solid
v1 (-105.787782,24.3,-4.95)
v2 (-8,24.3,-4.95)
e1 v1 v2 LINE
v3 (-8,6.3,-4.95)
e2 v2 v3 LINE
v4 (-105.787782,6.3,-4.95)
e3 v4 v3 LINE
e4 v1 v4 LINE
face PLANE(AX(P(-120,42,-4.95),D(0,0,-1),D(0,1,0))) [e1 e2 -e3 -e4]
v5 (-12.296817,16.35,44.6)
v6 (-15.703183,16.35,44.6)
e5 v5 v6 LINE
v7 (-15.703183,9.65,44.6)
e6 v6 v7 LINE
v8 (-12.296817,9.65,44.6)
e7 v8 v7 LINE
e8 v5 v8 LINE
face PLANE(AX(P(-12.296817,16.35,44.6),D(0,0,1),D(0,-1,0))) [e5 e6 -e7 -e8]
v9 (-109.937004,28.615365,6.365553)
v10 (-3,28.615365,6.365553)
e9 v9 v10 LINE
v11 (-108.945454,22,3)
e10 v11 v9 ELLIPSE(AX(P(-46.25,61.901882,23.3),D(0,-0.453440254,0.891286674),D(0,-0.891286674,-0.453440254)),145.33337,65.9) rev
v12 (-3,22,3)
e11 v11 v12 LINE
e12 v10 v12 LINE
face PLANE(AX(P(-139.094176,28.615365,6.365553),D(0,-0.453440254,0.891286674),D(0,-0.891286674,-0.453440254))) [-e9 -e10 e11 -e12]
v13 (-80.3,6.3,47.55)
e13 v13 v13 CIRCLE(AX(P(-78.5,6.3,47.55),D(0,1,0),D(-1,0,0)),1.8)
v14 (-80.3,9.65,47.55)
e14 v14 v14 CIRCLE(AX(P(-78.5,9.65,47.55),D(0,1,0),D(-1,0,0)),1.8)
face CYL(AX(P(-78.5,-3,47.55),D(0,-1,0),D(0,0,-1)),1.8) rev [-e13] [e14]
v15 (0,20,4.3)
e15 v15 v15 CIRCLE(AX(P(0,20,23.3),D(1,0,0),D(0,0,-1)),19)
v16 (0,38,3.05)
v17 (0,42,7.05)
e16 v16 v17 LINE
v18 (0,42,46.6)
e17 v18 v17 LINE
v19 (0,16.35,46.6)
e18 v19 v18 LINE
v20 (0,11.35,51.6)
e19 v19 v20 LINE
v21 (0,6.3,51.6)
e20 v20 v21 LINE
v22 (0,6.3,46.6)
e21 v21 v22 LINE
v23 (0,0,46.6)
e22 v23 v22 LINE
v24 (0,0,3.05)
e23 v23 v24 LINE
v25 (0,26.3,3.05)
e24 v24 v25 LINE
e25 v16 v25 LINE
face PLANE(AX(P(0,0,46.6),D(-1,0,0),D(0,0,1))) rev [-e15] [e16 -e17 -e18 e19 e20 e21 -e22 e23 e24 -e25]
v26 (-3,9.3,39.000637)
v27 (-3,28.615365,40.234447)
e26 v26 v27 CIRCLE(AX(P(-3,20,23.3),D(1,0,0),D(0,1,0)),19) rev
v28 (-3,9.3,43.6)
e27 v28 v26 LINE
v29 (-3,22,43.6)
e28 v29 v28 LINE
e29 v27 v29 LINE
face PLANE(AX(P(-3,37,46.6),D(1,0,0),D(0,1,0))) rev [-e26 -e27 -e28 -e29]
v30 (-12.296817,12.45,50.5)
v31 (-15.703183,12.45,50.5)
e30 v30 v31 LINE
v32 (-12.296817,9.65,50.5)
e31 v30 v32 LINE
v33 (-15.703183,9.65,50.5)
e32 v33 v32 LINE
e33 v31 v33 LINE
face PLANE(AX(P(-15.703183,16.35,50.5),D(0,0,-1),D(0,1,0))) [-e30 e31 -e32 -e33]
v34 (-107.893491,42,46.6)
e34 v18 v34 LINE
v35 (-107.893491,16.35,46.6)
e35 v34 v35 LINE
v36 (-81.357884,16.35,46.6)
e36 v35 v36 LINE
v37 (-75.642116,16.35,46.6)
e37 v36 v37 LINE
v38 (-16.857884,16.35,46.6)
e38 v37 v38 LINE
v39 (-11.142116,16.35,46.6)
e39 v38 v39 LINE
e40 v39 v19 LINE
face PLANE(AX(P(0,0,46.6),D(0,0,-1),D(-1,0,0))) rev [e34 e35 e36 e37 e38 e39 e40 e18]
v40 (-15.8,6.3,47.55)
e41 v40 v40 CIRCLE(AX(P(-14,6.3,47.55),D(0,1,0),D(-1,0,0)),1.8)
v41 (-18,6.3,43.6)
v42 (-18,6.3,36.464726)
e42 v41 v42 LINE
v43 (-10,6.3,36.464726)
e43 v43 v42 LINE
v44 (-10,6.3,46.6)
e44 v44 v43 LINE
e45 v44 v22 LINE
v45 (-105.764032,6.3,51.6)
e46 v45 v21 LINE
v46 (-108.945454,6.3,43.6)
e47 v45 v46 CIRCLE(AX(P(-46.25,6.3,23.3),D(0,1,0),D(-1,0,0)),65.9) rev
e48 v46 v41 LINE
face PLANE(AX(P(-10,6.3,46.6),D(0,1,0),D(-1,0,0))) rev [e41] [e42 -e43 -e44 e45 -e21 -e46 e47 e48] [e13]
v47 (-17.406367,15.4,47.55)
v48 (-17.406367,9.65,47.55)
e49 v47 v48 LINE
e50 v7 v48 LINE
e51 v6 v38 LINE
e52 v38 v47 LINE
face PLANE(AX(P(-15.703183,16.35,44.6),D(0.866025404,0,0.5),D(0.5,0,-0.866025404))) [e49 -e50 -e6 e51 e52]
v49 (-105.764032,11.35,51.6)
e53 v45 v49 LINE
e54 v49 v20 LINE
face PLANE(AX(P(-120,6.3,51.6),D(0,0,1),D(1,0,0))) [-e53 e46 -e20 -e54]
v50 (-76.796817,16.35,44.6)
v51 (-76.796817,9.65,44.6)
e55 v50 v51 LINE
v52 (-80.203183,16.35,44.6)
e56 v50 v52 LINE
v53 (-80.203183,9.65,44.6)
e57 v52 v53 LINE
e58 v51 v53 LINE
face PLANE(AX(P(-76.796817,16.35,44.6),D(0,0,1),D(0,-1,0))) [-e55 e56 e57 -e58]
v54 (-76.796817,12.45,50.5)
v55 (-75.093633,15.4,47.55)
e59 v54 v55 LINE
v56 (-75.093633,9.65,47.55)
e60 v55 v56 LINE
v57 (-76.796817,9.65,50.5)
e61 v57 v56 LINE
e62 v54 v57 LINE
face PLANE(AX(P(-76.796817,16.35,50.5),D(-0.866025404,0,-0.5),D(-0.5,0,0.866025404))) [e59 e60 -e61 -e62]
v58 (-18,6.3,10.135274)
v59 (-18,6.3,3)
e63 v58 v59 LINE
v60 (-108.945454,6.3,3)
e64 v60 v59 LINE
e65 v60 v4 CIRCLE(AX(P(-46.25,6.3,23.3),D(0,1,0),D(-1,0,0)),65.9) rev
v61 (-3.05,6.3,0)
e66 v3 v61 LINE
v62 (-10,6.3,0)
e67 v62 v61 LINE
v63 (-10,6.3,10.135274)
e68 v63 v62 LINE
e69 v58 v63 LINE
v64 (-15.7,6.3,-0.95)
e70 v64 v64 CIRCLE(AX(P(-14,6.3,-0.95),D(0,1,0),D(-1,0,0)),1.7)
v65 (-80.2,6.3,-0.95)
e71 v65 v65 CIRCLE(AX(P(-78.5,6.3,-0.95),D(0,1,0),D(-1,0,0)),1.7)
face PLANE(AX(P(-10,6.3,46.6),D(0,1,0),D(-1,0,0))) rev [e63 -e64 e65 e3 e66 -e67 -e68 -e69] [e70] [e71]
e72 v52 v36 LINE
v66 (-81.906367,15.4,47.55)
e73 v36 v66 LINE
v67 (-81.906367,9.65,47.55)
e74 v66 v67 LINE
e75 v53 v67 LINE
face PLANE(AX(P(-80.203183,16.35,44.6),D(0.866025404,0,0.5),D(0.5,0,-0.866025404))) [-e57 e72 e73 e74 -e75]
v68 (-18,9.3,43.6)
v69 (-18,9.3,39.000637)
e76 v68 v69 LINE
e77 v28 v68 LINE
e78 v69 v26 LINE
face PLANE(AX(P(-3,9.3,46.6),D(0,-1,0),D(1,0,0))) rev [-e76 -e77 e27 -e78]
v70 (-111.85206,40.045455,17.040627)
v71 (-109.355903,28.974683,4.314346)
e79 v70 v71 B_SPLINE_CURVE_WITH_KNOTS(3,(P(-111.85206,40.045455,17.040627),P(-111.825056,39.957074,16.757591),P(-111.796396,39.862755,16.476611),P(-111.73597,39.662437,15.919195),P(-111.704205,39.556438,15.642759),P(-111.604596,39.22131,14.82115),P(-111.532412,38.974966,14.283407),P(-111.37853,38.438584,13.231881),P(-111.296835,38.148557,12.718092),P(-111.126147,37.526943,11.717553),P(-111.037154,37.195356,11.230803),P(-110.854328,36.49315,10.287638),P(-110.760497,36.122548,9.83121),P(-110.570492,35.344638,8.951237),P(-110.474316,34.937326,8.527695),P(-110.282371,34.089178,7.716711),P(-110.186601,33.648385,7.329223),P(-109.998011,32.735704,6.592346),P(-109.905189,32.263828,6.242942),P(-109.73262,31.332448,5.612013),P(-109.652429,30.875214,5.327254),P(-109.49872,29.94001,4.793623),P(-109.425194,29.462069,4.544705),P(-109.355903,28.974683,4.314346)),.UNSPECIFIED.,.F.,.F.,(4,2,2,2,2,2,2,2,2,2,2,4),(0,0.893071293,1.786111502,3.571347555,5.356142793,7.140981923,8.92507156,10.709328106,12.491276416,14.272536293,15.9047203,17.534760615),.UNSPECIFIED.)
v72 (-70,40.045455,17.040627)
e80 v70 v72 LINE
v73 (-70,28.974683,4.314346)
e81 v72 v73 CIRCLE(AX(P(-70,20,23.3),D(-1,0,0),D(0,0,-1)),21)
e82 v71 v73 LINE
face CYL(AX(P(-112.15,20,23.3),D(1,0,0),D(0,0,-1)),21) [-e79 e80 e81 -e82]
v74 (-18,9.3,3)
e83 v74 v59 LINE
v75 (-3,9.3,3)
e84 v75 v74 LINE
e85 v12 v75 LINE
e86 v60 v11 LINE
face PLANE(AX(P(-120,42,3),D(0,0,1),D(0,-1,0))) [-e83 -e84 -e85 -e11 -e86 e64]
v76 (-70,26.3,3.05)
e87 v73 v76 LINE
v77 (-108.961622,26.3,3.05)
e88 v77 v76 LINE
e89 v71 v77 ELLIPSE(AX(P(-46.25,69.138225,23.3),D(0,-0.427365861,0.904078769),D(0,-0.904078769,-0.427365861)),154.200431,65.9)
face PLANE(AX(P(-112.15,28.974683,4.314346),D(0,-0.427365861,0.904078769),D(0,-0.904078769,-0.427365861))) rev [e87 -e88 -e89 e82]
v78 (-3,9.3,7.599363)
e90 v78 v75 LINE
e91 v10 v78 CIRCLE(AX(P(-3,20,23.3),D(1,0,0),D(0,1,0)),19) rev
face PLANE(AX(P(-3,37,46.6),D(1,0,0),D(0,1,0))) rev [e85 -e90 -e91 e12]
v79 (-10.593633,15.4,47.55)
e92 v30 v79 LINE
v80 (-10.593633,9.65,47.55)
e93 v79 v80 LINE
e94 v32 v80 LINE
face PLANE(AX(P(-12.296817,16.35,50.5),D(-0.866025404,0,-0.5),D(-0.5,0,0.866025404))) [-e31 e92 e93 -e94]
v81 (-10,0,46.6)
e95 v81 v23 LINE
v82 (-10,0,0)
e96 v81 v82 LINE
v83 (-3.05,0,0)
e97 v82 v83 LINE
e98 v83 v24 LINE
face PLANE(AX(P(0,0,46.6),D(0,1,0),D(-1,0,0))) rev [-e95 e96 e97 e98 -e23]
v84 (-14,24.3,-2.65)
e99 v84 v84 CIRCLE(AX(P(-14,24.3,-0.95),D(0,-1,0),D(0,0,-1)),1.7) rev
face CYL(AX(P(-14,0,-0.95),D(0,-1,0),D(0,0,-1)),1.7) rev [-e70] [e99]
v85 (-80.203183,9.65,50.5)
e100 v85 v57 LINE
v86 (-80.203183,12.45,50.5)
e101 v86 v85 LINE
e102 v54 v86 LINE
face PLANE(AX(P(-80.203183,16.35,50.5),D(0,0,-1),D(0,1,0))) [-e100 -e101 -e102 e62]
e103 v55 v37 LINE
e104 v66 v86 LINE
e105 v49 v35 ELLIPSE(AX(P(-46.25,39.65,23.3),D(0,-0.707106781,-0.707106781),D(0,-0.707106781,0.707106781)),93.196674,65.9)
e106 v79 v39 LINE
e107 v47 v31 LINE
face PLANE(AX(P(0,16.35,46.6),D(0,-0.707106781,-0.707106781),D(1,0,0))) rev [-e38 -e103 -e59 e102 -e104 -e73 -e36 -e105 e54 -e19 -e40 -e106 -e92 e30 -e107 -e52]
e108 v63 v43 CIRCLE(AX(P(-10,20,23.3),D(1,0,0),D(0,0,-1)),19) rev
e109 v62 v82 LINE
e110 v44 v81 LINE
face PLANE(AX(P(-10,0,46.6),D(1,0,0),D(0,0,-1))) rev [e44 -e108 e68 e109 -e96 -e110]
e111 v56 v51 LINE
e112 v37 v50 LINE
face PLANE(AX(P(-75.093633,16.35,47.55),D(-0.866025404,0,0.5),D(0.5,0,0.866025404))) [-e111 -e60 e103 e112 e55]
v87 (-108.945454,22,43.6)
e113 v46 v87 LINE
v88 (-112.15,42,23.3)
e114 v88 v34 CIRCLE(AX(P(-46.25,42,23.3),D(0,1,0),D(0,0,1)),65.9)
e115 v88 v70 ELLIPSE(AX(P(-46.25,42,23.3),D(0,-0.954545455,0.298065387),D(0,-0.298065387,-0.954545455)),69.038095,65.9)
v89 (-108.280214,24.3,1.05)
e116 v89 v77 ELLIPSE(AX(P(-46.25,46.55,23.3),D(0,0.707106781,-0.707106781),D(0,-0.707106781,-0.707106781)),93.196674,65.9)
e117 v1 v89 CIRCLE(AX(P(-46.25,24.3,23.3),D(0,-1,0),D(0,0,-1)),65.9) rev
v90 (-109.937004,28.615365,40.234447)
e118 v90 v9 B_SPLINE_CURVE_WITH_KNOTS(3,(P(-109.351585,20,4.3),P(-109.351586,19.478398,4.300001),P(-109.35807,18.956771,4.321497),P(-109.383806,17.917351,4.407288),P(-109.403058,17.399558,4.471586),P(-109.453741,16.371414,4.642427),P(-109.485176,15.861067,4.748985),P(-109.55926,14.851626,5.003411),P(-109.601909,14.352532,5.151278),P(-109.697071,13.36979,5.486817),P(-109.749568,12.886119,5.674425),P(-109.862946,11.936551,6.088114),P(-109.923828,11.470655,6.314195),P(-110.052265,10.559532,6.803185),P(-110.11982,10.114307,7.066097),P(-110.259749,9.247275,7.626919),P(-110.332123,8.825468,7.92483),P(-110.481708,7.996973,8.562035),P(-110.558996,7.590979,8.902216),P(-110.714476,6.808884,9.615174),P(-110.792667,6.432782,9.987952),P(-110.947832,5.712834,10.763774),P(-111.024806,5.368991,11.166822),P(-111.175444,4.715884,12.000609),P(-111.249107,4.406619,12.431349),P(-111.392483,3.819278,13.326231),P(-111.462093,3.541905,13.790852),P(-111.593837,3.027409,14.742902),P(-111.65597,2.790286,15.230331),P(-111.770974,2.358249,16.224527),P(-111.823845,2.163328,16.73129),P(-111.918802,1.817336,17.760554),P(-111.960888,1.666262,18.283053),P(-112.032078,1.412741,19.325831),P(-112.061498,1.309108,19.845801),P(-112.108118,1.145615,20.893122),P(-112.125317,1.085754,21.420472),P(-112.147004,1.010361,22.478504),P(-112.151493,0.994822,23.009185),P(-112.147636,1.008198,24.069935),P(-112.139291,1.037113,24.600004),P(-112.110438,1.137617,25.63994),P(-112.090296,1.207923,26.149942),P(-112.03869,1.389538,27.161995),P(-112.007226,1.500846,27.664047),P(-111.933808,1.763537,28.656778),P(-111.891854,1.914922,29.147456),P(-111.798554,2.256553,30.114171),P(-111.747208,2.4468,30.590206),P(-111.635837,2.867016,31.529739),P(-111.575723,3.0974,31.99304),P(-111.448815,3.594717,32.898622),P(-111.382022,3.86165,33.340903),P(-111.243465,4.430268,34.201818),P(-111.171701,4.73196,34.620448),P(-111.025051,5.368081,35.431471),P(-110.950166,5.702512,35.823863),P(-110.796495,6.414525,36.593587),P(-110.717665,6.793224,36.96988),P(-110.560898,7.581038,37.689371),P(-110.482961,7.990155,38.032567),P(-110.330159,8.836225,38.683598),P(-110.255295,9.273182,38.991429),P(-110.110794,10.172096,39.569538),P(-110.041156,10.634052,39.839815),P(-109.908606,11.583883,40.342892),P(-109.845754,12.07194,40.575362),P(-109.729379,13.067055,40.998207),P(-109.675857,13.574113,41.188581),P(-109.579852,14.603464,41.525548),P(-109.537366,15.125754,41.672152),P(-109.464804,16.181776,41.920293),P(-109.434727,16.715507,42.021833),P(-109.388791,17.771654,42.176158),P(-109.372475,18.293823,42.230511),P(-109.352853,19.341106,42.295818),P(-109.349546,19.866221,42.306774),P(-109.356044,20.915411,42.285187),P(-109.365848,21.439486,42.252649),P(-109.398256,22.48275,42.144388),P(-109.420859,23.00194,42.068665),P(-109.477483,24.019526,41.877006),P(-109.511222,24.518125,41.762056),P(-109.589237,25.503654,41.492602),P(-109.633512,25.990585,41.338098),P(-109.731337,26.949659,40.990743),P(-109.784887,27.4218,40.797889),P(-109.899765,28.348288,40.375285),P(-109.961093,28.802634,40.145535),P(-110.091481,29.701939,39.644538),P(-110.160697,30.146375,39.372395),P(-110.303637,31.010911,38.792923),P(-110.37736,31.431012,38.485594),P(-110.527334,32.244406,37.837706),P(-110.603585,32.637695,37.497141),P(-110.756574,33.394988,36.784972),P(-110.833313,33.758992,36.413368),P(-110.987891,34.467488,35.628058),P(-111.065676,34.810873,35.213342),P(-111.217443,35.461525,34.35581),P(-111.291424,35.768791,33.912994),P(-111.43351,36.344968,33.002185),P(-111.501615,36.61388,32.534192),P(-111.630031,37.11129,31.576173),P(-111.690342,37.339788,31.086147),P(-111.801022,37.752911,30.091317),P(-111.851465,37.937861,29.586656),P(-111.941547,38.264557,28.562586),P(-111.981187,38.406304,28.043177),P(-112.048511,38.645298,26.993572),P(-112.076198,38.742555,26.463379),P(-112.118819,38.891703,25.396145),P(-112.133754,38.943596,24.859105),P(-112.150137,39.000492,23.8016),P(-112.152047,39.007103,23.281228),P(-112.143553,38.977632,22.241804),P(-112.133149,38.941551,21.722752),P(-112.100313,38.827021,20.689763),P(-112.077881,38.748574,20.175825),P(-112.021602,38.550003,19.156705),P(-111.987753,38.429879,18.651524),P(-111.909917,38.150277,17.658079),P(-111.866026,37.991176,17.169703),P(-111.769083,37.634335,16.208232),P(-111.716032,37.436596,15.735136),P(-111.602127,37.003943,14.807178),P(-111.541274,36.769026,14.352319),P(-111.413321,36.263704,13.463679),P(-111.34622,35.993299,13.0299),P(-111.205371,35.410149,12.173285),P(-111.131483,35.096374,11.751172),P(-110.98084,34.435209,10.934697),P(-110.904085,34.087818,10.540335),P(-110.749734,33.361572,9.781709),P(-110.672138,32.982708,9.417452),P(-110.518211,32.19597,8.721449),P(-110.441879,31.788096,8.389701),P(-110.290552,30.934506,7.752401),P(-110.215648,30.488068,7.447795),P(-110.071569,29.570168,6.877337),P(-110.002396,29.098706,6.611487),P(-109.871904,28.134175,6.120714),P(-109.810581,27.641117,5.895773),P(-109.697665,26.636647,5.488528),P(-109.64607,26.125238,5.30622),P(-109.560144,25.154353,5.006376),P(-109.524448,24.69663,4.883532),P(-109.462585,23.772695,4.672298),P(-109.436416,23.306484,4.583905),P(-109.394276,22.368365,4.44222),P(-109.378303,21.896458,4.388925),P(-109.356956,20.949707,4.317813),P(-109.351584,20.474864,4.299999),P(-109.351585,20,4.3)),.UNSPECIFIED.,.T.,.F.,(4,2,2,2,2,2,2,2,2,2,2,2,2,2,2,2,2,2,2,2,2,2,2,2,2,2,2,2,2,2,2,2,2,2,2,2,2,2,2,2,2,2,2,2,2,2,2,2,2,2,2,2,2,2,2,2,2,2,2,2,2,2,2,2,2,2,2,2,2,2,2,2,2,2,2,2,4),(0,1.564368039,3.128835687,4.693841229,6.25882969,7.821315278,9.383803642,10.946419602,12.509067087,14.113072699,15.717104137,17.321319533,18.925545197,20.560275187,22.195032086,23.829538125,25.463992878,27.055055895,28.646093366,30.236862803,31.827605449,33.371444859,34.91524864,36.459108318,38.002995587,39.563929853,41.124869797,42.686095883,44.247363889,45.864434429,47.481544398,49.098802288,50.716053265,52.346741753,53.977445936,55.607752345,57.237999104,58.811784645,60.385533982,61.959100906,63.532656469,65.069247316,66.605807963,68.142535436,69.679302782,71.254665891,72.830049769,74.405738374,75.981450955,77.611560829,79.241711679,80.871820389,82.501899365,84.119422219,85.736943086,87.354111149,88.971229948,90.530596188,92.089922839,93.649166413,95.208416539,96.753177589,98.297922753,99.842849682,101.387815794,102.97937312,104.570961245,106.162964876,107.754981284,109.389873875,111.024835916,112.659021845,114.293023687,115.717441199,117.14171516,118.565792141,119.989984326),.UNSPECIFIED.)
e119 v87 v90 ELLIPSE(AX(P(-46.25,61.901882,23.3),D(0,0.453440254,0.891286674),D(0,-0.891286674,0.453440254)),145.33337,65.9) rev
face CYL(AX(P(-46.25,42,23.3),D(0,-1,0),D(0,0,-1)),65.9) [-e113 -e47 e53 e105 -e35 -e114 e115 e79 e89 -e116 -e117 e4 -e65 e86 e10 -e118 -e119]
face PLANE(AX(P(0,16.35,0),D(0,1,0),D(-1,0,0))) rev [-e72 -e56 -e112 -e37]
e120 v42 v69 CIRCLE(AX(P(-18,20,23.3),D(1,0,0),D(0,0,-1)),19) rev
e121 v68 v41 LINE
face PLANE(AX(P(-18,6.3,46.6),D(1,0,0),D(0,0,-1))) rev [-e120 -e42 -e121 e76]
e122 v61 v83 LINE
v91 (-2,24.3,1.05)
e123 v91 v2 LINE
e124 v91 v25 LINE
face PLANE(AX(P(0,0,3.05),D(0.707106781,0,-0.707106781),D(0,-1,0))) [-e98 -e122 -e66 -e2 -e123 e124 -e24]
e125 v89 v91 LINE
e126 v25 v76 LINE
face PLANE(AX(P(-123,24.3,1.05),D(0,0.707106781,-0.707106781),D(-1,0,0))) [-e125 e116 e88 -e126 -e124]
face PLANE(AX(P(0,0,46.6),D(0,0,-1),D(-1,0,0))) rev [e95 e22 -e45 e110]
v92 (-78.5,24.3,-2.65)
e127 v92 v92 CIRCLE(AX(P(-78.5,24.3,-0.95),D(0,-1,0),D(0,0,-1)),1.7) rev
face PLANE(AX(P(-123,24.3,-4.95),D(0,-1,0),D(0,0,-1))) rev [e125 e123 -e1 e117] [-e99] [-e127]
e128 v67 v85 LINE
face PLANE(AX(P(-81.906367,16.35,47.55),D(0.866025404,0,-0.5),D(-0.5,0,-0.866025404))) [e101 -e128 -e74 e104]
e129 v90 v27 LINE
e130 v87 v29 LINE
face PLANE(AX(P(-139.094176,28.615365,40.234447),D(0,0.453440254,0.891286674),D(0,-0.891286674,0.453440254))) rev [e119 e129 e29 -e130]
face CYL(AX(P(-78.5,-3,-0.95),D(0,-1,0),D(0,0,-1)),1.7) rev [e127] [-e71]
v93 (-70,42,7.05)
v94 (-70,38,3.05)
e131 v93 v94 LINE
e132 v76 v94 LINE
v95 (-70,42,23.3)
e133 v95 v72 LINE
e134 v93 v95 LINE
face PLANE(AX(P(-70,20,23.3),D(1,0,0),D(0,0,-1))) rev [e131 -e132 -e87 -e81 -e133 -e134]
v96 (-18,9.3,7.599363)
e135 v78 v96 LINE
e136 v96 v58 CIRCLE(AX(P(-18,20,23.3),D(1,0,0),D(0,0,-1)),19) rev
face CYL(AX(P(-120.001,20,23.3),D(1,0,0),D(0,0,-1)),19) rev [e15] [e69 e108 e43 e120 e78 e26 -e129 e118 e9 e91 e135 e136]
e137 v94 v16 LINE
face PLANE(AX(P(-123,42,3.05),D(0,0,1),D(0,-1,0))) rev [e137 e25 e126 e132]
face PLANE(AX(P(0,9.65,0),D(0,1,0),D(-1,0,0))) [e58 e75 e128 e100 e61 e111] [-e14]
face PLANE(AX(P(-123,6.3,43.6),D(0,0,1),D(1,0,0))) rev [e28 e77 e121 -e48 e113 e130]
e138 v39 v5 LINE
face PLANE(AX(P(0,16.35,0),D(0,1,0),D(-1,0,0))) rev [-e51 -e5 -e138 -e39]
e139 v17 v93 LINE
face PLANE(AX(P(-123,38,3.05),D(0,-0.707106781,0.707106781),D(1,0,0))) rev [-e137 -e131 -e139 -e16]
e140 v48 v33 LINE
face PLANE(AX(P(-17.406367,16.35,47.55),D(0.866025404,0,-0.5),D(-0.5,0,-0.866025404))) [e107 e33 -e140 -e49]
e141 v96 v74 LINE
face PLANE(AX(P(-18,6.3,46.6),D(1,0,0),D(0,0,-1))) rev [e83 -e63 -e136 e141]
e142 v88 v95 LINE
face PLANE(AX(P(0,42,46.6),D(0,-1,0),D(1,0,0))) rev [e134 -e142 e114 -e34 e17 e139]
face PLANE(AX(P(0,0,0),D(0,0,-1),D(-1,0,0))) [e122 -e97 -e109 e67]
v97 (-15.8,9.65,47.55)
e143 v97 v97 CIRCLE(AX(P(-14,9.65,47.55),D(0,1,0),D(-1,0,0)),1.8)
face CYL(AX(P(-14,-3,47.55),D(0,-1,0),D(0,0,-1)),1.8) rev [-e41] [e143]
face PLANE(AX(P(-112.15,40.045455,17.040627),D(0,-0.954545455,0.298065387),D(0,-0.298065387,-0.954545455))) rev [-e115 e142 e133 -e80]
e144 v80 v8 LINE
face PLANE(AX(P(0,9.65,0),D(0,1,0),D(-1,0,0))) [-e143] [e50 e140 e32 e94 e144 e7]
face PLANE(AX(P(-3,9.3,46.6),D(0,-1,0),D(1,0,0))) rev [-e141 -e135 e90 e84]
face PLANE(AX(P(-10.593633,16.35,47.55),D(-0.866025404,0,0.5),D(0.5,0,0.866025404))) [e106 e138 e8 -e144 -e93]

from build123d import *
from build123d.topology import SkipClean

# Parameters (mm, degrees)
BOSS_EXTRUDE1_DEPTH            = 46.6
CUT_EXTRUDE1_REACH             = 137.409
SKETCH2_R                      = 19
SKETCH3_W                      = 3
SKETCH3_H                      = 30.7
BOSS_EXTRUDE2_DEPTH            = 120
SKETCH4_W                      = 5
SKETCH4_H                      = 7.85
BOSS_EXTRUDE3_DEPTH            = 120
SKETCH6_W                      = 3
SKETCH6_H                      = 35.7
BOSS_EXTRUDE4_DEPTH            = 120
SKETCH8_W                      = 4.95
SKETCH8_H                      = 35.7
BOSS_EXTRUDE5_DEPTH            = 120
BOSS_EXTRUDE7_DEPTH            = 117
CHAMFER2_SIZE                  = 8
M3_CLEARANCE_HOLE1_D           = 3.4
M3_CLEARANCE_HOLE1_ON_FACE_2_D = 3.4
SKETCH12_W                     = 8
SKETCH12_H                     = 17.7
CUT_EXTRUDE4_DEPTH             = 140.841195647
CHAMFER4_SIZE                  = 4
CHAMFER5_SIZE                  = 2
CUT_EXTRUDE5_START             = 6.3
CUT_EXTRUDE5_DEPTH             = 35.7
CUT_EXTRUDE6_START             = -70
CUT_EXTRUDE6_DEPTH             = 61.400086431
CUT_EXTRUDE7_START             = -4.5
CUT_EXTRUDE7_DEPTH             = 6.7
M3_CLEARANCE_HOLE2_D           = 3.6
M3_CLEARANCE_HOLE2_DEPTH       = 12.65
CHAMFER6_SIZE                  = 2.2
CUT_EXTRUDE8_DEPTH             = 131.400086431


# Read off the part's stored shape, not the designer's step: Cut-Extrude5
with BuildPart() as part:
    # Sketch1 → Boss-Extrude1 (new body)
    with BuildSketch(Plane.XY):
        Polygon((0, 0), (0, 42), (-120, 42), (-120, 37), (-3, 37), (-3, 9.3), (-18, 9.3), (-18, 6.3), (-10, 6.3), (-10, 0), align=None)
    extrude(amount=BOSS_EXTRUDE1_DEPTH)

    # Sketch2 → Cut-Extrude1 (cut, up to next)
    with BuildSketch(Plane(origin=(0, 0, 0), x_dir=(0, 0, -1), z_dir=(1, 0, 0)), mode=Mode.PRIVATE) as cut_extrude1_sk1:
        with Locations((-23.3, 20)):
            Circle(SKETCH2_R)
    cut_extrude1_tool1 = extrude(cut_extrude1_sk1.sketch, amount=-CUT_EXTRUDE1_REACH, mode=Mode.PRIVATE) & part.part
    add(cut_extrude1_tool1.solids().sort_by_distance((0, 20, 23.3))[0], mode=Mode.SUBTRACT)

    # Sketch3 → Boss-Extrude2 (add)
    with BuildSketch(Plane.ZY.offset(3)):
        with Locations((45.1, 21.65)):
            Rectangle(SKETCH3_W, SKETCH3_H)
    extrude(amount=BOSS_EXTRUDE2_DEPTH)

    # Sketch4 → Boss-Extrude3 (add)
    with BuildSketch(Plane(origin=(0, 0, 0), x_dir=(0, 0, -1), z_dir=(1, 0, 0))):
        with Locations((-49.1, 10.225)):
            Rectangle(SKETCH4_W, SKETCH4_H)
    extrude(amount=-BOSS_EXTRUDE3_DEPTH)

    # Sketch6 → Boss-Extrude4 (add)
    with BuildSketch(Plane(origin=(0, 0, 0), x_dir=(0, 0, -1), z_dir=(1, 0, 0))):
        with Locations((-1.5, 24.15)):
            Rectangle(SKETCH6_W, SKETCH6_H)
    extrude(amount=-BOSS_EXTRUDE4_DEPTH)

    # Sketch8 → Boss-Extrude5 (add)
    with BuildSketch(Plane(origin=(0, 0, 0), x_dir=(0, 0, -1), z_dir=(1, 0, 0))):
        with Locations((2.475, 24.15)):
            Rectangle(SKETCH8_W, SKETCH8_H)
    extrude(amount=-BOSS_EXTRUDE5_DEPTH)

    # Sketch14 → Boss-Extrude7 (add)
    with SkipClean():  # the faces are left unmerged after this step: merging them gives an invalid solid
        with BuildSketch(Plane.ZY.offset(3)):
            with BuildLine():
                Line((6.365553185, 28.615364824), (3, 22))
                Line((3, 22), (3, 37))
                Line((3, 37), (14.814718626, 37))
                ThreePointArc((14.814718626, 37), (9.91657099, 33.486431253), (6.365553185, 28.615364824))
            make_face()
            with BuildLine():
                Line((40.234446815, 28.615364824), (43.6, 22))
                Line((43.6, 22), (43.6, 37))
                Line((43.6, 37), (31.785281374, 37))
                ThreePointArc((31.785281374, 37), (36.68342901, 33.486431253), (40.234446815, 28.615364824))
            make_face()
        extrude(amount=BOSS_EXTRUDE7_DEPTH)

    # Chamfer2
    chamfer2_edges = [part.edges().sort_by_distance(p)[0] for p in [
        (0, 24.15, -4.95),
    ]]
    chamfer(chamfer2_edges, length=CHAMFER2_SIZE)

    # M3 Clearance Hole1 (through all)
    with Locations(Plane(origin=(-14, 0, -0.95), x_dir=(0, 0, -1), z_dir=(0, -1, 0))):
        with Locations((0, 0)):
            Hole(M3_CLEARANCE_HOLE1_D / 2)

    # M3 Clearance Hole1 on face 2 (through all)
    with Locations(Plane(origin=(-78.5, -3, -0.95), x_dir=(0, 0, -1), z_dir=(0, -1, 0))):
        with Locations((0, 0)):
            Hole(M3_CLEARANCE_HOLE1_ON_FACE_2_D / 2)

    # Sketch12 → Cut-Extrude4 (cut, through all)
    with SkipClean():  # the faces are left unmerged after this step: merging them gives an invalid solid
        with BuildSketch(Plane(origin=(0, 0, 0), x_dir=(0, 0, -1), z_dir=(1, 0, 0))):
            with Locations((0.95, 33.15)):
                Rectangle(SKETCH12_W, SKETCH12_H)
        extrude(amount=-CUT_EXTRUDE4_DEPTH, mode=Mode.SUBTRACT)

    # Chamfer4
    chamfer4_edges = [part.edges().sort_by_distance(p)[0] for p in [
        (-60, 42, 3.05),
    ]]
    chamfer(chamfer4_edges, length=CHAMFER4_SIZE)

    # Chamfer5
    chamfer5_edges = [part.edges().sort_by_distance(p)[0] for p in [
        (-60, 24.3, 3.05),
    ]]
    chamfer(chamfer5_edges, length=CHAMFER5_SIZE)

    # Cut-Extrude5 outline → Cut-Extrude5 (cut)
    with SkipClean():  # the faces are left unmerged after this step: merging them gives an invalid solid
        with BuildSketch(Plane(origin=(0, 0, 0), x_dir=(1, 0, 0), z_dir=(0, 1, 0)).offset(CUT_EXTRUDE5_START)):
            with BuildLine():
                Line((-120, -51.6), (-105.764031959, -51.6))
                ThreePointArc((-105.764031959, -51.6), (-112.149994188, -23.327677022), (-105.787782122, 4.95))
                Line((-105.787782122, 4.95), (-120, 4.95))
                Line((-120, 4.95), (-120, -43.6))
                Line((-120, -43.6), (-123, -43.6))
                Line((-123, -43.6), (-123, -46.6))
                Line((-123, -46.6), (-120, -46.6))
                Line((-120, -46.6), (-120, -51.6))
            make_face()
        extrude(amount=CUT_EXTRUDE5_DEPTH, mode=Mode.SUBTRACT)

    # Sketch16 → Cut-Extrude6 (cut, through all)
    with SkipClean():  # the faces are left unmerged after this step: merging them gives an invalid solid
        with BuildSketch(Plane(origin=(0, 0, 0), x_dir=(0, 0, -1), z_dir=(1, 0, 0)).offset(CUT_EXTRUDE6_START)):
            with BuildLine():
                Line((-3.05, 26.3), (-3.05, 42))
                Line((-3.05, 42), (-23.3, 42))
                Line((-23.3, 42), (-17.040626863, 40.045454545))
                ThreePointArc((-17.040626863, 40.045454545), (-9.51709951, 35.84397848), (-4.314345847, 28.97468308))
                Line((-4.314345847, 28.97468308), (-3.05, 26.3))
            make_face()
        extrude(amount=-CUT_EXTRUDE6_DEPTH, mode=Mode.SUBTRACT)

    # Sketch18 → Cut-Extrude7 (cut)
    with SkipClean():  # the faces are left unmerged after this step: merging them gives an invalid solid
        with BuildSketch(Plane(origin=(0, 14.15, 0), x_dir=(1, 0, 0), z_dir=(0, 1, 0)).offset(CUT_EXTRUDE7_START)):
            Polygon((-10.593633412, -47.55), (-12.296816706, -44.6), (-15.703183294, -44.6), (-17.406366588, -47.55), (-15.703183294, -50.5), (-12.296816706, -50.5), align=None)
            Polygon((-81.906366588, -47.55), (-80.203183294, -50.5), (-76.796816706, -50.5), (-75.093633412, -47.55), (-76.796816706, -44.6), (-80.203183294, -44.6), align=None)
        extrude(amount=CUT_EXTRUDE7_DEPTH, mode=Mode.SUBTRACT)

    # M3 Clearance Hole2
    with Locations(Plane(origin=(-78.5, -3, 47.55), x_dir=(0, 0, -1), z_dir=(0, -1, 0))):
        with Locations((0, 0), (0, 64.5)):
            Hole(M3_CLEARANCE_HOLE2_D / 2, depth=M3_CLEARANCE_HOLE2_DEPTH)

    # Chamfer6
    chamfer6_edges = [part.edges().sort_by_distance(p)[0] for p in [
        (-94.625687487, 14.15, 46.6),
        (-46.25, 14.15, 46.6),
        (-5.571058084, 14.15, 46.6),
    ]]
    chamfer(chamfer6_edges, length=CHAMFER6_SIZE)

    # Sketch23 → Cut-Extrude8 (cut, through all)
    with SkipClean():  # the faces are left unmerged after this step: merging them gives an invalid solid
        with BuildSketch(Plane(origin=(0, 0, 0), x_dir=(0, 0, -1), z_dir=(1, 0, 0))):
            Polygon((-48.8, 14.15), (-51.6, 11.35), (-51.6, 14.15), align=None)
        extrude(amount=-CUT_EXTRUDE8_DEPTH, mode=Mode.SUBTRACT)


solid = part.part
